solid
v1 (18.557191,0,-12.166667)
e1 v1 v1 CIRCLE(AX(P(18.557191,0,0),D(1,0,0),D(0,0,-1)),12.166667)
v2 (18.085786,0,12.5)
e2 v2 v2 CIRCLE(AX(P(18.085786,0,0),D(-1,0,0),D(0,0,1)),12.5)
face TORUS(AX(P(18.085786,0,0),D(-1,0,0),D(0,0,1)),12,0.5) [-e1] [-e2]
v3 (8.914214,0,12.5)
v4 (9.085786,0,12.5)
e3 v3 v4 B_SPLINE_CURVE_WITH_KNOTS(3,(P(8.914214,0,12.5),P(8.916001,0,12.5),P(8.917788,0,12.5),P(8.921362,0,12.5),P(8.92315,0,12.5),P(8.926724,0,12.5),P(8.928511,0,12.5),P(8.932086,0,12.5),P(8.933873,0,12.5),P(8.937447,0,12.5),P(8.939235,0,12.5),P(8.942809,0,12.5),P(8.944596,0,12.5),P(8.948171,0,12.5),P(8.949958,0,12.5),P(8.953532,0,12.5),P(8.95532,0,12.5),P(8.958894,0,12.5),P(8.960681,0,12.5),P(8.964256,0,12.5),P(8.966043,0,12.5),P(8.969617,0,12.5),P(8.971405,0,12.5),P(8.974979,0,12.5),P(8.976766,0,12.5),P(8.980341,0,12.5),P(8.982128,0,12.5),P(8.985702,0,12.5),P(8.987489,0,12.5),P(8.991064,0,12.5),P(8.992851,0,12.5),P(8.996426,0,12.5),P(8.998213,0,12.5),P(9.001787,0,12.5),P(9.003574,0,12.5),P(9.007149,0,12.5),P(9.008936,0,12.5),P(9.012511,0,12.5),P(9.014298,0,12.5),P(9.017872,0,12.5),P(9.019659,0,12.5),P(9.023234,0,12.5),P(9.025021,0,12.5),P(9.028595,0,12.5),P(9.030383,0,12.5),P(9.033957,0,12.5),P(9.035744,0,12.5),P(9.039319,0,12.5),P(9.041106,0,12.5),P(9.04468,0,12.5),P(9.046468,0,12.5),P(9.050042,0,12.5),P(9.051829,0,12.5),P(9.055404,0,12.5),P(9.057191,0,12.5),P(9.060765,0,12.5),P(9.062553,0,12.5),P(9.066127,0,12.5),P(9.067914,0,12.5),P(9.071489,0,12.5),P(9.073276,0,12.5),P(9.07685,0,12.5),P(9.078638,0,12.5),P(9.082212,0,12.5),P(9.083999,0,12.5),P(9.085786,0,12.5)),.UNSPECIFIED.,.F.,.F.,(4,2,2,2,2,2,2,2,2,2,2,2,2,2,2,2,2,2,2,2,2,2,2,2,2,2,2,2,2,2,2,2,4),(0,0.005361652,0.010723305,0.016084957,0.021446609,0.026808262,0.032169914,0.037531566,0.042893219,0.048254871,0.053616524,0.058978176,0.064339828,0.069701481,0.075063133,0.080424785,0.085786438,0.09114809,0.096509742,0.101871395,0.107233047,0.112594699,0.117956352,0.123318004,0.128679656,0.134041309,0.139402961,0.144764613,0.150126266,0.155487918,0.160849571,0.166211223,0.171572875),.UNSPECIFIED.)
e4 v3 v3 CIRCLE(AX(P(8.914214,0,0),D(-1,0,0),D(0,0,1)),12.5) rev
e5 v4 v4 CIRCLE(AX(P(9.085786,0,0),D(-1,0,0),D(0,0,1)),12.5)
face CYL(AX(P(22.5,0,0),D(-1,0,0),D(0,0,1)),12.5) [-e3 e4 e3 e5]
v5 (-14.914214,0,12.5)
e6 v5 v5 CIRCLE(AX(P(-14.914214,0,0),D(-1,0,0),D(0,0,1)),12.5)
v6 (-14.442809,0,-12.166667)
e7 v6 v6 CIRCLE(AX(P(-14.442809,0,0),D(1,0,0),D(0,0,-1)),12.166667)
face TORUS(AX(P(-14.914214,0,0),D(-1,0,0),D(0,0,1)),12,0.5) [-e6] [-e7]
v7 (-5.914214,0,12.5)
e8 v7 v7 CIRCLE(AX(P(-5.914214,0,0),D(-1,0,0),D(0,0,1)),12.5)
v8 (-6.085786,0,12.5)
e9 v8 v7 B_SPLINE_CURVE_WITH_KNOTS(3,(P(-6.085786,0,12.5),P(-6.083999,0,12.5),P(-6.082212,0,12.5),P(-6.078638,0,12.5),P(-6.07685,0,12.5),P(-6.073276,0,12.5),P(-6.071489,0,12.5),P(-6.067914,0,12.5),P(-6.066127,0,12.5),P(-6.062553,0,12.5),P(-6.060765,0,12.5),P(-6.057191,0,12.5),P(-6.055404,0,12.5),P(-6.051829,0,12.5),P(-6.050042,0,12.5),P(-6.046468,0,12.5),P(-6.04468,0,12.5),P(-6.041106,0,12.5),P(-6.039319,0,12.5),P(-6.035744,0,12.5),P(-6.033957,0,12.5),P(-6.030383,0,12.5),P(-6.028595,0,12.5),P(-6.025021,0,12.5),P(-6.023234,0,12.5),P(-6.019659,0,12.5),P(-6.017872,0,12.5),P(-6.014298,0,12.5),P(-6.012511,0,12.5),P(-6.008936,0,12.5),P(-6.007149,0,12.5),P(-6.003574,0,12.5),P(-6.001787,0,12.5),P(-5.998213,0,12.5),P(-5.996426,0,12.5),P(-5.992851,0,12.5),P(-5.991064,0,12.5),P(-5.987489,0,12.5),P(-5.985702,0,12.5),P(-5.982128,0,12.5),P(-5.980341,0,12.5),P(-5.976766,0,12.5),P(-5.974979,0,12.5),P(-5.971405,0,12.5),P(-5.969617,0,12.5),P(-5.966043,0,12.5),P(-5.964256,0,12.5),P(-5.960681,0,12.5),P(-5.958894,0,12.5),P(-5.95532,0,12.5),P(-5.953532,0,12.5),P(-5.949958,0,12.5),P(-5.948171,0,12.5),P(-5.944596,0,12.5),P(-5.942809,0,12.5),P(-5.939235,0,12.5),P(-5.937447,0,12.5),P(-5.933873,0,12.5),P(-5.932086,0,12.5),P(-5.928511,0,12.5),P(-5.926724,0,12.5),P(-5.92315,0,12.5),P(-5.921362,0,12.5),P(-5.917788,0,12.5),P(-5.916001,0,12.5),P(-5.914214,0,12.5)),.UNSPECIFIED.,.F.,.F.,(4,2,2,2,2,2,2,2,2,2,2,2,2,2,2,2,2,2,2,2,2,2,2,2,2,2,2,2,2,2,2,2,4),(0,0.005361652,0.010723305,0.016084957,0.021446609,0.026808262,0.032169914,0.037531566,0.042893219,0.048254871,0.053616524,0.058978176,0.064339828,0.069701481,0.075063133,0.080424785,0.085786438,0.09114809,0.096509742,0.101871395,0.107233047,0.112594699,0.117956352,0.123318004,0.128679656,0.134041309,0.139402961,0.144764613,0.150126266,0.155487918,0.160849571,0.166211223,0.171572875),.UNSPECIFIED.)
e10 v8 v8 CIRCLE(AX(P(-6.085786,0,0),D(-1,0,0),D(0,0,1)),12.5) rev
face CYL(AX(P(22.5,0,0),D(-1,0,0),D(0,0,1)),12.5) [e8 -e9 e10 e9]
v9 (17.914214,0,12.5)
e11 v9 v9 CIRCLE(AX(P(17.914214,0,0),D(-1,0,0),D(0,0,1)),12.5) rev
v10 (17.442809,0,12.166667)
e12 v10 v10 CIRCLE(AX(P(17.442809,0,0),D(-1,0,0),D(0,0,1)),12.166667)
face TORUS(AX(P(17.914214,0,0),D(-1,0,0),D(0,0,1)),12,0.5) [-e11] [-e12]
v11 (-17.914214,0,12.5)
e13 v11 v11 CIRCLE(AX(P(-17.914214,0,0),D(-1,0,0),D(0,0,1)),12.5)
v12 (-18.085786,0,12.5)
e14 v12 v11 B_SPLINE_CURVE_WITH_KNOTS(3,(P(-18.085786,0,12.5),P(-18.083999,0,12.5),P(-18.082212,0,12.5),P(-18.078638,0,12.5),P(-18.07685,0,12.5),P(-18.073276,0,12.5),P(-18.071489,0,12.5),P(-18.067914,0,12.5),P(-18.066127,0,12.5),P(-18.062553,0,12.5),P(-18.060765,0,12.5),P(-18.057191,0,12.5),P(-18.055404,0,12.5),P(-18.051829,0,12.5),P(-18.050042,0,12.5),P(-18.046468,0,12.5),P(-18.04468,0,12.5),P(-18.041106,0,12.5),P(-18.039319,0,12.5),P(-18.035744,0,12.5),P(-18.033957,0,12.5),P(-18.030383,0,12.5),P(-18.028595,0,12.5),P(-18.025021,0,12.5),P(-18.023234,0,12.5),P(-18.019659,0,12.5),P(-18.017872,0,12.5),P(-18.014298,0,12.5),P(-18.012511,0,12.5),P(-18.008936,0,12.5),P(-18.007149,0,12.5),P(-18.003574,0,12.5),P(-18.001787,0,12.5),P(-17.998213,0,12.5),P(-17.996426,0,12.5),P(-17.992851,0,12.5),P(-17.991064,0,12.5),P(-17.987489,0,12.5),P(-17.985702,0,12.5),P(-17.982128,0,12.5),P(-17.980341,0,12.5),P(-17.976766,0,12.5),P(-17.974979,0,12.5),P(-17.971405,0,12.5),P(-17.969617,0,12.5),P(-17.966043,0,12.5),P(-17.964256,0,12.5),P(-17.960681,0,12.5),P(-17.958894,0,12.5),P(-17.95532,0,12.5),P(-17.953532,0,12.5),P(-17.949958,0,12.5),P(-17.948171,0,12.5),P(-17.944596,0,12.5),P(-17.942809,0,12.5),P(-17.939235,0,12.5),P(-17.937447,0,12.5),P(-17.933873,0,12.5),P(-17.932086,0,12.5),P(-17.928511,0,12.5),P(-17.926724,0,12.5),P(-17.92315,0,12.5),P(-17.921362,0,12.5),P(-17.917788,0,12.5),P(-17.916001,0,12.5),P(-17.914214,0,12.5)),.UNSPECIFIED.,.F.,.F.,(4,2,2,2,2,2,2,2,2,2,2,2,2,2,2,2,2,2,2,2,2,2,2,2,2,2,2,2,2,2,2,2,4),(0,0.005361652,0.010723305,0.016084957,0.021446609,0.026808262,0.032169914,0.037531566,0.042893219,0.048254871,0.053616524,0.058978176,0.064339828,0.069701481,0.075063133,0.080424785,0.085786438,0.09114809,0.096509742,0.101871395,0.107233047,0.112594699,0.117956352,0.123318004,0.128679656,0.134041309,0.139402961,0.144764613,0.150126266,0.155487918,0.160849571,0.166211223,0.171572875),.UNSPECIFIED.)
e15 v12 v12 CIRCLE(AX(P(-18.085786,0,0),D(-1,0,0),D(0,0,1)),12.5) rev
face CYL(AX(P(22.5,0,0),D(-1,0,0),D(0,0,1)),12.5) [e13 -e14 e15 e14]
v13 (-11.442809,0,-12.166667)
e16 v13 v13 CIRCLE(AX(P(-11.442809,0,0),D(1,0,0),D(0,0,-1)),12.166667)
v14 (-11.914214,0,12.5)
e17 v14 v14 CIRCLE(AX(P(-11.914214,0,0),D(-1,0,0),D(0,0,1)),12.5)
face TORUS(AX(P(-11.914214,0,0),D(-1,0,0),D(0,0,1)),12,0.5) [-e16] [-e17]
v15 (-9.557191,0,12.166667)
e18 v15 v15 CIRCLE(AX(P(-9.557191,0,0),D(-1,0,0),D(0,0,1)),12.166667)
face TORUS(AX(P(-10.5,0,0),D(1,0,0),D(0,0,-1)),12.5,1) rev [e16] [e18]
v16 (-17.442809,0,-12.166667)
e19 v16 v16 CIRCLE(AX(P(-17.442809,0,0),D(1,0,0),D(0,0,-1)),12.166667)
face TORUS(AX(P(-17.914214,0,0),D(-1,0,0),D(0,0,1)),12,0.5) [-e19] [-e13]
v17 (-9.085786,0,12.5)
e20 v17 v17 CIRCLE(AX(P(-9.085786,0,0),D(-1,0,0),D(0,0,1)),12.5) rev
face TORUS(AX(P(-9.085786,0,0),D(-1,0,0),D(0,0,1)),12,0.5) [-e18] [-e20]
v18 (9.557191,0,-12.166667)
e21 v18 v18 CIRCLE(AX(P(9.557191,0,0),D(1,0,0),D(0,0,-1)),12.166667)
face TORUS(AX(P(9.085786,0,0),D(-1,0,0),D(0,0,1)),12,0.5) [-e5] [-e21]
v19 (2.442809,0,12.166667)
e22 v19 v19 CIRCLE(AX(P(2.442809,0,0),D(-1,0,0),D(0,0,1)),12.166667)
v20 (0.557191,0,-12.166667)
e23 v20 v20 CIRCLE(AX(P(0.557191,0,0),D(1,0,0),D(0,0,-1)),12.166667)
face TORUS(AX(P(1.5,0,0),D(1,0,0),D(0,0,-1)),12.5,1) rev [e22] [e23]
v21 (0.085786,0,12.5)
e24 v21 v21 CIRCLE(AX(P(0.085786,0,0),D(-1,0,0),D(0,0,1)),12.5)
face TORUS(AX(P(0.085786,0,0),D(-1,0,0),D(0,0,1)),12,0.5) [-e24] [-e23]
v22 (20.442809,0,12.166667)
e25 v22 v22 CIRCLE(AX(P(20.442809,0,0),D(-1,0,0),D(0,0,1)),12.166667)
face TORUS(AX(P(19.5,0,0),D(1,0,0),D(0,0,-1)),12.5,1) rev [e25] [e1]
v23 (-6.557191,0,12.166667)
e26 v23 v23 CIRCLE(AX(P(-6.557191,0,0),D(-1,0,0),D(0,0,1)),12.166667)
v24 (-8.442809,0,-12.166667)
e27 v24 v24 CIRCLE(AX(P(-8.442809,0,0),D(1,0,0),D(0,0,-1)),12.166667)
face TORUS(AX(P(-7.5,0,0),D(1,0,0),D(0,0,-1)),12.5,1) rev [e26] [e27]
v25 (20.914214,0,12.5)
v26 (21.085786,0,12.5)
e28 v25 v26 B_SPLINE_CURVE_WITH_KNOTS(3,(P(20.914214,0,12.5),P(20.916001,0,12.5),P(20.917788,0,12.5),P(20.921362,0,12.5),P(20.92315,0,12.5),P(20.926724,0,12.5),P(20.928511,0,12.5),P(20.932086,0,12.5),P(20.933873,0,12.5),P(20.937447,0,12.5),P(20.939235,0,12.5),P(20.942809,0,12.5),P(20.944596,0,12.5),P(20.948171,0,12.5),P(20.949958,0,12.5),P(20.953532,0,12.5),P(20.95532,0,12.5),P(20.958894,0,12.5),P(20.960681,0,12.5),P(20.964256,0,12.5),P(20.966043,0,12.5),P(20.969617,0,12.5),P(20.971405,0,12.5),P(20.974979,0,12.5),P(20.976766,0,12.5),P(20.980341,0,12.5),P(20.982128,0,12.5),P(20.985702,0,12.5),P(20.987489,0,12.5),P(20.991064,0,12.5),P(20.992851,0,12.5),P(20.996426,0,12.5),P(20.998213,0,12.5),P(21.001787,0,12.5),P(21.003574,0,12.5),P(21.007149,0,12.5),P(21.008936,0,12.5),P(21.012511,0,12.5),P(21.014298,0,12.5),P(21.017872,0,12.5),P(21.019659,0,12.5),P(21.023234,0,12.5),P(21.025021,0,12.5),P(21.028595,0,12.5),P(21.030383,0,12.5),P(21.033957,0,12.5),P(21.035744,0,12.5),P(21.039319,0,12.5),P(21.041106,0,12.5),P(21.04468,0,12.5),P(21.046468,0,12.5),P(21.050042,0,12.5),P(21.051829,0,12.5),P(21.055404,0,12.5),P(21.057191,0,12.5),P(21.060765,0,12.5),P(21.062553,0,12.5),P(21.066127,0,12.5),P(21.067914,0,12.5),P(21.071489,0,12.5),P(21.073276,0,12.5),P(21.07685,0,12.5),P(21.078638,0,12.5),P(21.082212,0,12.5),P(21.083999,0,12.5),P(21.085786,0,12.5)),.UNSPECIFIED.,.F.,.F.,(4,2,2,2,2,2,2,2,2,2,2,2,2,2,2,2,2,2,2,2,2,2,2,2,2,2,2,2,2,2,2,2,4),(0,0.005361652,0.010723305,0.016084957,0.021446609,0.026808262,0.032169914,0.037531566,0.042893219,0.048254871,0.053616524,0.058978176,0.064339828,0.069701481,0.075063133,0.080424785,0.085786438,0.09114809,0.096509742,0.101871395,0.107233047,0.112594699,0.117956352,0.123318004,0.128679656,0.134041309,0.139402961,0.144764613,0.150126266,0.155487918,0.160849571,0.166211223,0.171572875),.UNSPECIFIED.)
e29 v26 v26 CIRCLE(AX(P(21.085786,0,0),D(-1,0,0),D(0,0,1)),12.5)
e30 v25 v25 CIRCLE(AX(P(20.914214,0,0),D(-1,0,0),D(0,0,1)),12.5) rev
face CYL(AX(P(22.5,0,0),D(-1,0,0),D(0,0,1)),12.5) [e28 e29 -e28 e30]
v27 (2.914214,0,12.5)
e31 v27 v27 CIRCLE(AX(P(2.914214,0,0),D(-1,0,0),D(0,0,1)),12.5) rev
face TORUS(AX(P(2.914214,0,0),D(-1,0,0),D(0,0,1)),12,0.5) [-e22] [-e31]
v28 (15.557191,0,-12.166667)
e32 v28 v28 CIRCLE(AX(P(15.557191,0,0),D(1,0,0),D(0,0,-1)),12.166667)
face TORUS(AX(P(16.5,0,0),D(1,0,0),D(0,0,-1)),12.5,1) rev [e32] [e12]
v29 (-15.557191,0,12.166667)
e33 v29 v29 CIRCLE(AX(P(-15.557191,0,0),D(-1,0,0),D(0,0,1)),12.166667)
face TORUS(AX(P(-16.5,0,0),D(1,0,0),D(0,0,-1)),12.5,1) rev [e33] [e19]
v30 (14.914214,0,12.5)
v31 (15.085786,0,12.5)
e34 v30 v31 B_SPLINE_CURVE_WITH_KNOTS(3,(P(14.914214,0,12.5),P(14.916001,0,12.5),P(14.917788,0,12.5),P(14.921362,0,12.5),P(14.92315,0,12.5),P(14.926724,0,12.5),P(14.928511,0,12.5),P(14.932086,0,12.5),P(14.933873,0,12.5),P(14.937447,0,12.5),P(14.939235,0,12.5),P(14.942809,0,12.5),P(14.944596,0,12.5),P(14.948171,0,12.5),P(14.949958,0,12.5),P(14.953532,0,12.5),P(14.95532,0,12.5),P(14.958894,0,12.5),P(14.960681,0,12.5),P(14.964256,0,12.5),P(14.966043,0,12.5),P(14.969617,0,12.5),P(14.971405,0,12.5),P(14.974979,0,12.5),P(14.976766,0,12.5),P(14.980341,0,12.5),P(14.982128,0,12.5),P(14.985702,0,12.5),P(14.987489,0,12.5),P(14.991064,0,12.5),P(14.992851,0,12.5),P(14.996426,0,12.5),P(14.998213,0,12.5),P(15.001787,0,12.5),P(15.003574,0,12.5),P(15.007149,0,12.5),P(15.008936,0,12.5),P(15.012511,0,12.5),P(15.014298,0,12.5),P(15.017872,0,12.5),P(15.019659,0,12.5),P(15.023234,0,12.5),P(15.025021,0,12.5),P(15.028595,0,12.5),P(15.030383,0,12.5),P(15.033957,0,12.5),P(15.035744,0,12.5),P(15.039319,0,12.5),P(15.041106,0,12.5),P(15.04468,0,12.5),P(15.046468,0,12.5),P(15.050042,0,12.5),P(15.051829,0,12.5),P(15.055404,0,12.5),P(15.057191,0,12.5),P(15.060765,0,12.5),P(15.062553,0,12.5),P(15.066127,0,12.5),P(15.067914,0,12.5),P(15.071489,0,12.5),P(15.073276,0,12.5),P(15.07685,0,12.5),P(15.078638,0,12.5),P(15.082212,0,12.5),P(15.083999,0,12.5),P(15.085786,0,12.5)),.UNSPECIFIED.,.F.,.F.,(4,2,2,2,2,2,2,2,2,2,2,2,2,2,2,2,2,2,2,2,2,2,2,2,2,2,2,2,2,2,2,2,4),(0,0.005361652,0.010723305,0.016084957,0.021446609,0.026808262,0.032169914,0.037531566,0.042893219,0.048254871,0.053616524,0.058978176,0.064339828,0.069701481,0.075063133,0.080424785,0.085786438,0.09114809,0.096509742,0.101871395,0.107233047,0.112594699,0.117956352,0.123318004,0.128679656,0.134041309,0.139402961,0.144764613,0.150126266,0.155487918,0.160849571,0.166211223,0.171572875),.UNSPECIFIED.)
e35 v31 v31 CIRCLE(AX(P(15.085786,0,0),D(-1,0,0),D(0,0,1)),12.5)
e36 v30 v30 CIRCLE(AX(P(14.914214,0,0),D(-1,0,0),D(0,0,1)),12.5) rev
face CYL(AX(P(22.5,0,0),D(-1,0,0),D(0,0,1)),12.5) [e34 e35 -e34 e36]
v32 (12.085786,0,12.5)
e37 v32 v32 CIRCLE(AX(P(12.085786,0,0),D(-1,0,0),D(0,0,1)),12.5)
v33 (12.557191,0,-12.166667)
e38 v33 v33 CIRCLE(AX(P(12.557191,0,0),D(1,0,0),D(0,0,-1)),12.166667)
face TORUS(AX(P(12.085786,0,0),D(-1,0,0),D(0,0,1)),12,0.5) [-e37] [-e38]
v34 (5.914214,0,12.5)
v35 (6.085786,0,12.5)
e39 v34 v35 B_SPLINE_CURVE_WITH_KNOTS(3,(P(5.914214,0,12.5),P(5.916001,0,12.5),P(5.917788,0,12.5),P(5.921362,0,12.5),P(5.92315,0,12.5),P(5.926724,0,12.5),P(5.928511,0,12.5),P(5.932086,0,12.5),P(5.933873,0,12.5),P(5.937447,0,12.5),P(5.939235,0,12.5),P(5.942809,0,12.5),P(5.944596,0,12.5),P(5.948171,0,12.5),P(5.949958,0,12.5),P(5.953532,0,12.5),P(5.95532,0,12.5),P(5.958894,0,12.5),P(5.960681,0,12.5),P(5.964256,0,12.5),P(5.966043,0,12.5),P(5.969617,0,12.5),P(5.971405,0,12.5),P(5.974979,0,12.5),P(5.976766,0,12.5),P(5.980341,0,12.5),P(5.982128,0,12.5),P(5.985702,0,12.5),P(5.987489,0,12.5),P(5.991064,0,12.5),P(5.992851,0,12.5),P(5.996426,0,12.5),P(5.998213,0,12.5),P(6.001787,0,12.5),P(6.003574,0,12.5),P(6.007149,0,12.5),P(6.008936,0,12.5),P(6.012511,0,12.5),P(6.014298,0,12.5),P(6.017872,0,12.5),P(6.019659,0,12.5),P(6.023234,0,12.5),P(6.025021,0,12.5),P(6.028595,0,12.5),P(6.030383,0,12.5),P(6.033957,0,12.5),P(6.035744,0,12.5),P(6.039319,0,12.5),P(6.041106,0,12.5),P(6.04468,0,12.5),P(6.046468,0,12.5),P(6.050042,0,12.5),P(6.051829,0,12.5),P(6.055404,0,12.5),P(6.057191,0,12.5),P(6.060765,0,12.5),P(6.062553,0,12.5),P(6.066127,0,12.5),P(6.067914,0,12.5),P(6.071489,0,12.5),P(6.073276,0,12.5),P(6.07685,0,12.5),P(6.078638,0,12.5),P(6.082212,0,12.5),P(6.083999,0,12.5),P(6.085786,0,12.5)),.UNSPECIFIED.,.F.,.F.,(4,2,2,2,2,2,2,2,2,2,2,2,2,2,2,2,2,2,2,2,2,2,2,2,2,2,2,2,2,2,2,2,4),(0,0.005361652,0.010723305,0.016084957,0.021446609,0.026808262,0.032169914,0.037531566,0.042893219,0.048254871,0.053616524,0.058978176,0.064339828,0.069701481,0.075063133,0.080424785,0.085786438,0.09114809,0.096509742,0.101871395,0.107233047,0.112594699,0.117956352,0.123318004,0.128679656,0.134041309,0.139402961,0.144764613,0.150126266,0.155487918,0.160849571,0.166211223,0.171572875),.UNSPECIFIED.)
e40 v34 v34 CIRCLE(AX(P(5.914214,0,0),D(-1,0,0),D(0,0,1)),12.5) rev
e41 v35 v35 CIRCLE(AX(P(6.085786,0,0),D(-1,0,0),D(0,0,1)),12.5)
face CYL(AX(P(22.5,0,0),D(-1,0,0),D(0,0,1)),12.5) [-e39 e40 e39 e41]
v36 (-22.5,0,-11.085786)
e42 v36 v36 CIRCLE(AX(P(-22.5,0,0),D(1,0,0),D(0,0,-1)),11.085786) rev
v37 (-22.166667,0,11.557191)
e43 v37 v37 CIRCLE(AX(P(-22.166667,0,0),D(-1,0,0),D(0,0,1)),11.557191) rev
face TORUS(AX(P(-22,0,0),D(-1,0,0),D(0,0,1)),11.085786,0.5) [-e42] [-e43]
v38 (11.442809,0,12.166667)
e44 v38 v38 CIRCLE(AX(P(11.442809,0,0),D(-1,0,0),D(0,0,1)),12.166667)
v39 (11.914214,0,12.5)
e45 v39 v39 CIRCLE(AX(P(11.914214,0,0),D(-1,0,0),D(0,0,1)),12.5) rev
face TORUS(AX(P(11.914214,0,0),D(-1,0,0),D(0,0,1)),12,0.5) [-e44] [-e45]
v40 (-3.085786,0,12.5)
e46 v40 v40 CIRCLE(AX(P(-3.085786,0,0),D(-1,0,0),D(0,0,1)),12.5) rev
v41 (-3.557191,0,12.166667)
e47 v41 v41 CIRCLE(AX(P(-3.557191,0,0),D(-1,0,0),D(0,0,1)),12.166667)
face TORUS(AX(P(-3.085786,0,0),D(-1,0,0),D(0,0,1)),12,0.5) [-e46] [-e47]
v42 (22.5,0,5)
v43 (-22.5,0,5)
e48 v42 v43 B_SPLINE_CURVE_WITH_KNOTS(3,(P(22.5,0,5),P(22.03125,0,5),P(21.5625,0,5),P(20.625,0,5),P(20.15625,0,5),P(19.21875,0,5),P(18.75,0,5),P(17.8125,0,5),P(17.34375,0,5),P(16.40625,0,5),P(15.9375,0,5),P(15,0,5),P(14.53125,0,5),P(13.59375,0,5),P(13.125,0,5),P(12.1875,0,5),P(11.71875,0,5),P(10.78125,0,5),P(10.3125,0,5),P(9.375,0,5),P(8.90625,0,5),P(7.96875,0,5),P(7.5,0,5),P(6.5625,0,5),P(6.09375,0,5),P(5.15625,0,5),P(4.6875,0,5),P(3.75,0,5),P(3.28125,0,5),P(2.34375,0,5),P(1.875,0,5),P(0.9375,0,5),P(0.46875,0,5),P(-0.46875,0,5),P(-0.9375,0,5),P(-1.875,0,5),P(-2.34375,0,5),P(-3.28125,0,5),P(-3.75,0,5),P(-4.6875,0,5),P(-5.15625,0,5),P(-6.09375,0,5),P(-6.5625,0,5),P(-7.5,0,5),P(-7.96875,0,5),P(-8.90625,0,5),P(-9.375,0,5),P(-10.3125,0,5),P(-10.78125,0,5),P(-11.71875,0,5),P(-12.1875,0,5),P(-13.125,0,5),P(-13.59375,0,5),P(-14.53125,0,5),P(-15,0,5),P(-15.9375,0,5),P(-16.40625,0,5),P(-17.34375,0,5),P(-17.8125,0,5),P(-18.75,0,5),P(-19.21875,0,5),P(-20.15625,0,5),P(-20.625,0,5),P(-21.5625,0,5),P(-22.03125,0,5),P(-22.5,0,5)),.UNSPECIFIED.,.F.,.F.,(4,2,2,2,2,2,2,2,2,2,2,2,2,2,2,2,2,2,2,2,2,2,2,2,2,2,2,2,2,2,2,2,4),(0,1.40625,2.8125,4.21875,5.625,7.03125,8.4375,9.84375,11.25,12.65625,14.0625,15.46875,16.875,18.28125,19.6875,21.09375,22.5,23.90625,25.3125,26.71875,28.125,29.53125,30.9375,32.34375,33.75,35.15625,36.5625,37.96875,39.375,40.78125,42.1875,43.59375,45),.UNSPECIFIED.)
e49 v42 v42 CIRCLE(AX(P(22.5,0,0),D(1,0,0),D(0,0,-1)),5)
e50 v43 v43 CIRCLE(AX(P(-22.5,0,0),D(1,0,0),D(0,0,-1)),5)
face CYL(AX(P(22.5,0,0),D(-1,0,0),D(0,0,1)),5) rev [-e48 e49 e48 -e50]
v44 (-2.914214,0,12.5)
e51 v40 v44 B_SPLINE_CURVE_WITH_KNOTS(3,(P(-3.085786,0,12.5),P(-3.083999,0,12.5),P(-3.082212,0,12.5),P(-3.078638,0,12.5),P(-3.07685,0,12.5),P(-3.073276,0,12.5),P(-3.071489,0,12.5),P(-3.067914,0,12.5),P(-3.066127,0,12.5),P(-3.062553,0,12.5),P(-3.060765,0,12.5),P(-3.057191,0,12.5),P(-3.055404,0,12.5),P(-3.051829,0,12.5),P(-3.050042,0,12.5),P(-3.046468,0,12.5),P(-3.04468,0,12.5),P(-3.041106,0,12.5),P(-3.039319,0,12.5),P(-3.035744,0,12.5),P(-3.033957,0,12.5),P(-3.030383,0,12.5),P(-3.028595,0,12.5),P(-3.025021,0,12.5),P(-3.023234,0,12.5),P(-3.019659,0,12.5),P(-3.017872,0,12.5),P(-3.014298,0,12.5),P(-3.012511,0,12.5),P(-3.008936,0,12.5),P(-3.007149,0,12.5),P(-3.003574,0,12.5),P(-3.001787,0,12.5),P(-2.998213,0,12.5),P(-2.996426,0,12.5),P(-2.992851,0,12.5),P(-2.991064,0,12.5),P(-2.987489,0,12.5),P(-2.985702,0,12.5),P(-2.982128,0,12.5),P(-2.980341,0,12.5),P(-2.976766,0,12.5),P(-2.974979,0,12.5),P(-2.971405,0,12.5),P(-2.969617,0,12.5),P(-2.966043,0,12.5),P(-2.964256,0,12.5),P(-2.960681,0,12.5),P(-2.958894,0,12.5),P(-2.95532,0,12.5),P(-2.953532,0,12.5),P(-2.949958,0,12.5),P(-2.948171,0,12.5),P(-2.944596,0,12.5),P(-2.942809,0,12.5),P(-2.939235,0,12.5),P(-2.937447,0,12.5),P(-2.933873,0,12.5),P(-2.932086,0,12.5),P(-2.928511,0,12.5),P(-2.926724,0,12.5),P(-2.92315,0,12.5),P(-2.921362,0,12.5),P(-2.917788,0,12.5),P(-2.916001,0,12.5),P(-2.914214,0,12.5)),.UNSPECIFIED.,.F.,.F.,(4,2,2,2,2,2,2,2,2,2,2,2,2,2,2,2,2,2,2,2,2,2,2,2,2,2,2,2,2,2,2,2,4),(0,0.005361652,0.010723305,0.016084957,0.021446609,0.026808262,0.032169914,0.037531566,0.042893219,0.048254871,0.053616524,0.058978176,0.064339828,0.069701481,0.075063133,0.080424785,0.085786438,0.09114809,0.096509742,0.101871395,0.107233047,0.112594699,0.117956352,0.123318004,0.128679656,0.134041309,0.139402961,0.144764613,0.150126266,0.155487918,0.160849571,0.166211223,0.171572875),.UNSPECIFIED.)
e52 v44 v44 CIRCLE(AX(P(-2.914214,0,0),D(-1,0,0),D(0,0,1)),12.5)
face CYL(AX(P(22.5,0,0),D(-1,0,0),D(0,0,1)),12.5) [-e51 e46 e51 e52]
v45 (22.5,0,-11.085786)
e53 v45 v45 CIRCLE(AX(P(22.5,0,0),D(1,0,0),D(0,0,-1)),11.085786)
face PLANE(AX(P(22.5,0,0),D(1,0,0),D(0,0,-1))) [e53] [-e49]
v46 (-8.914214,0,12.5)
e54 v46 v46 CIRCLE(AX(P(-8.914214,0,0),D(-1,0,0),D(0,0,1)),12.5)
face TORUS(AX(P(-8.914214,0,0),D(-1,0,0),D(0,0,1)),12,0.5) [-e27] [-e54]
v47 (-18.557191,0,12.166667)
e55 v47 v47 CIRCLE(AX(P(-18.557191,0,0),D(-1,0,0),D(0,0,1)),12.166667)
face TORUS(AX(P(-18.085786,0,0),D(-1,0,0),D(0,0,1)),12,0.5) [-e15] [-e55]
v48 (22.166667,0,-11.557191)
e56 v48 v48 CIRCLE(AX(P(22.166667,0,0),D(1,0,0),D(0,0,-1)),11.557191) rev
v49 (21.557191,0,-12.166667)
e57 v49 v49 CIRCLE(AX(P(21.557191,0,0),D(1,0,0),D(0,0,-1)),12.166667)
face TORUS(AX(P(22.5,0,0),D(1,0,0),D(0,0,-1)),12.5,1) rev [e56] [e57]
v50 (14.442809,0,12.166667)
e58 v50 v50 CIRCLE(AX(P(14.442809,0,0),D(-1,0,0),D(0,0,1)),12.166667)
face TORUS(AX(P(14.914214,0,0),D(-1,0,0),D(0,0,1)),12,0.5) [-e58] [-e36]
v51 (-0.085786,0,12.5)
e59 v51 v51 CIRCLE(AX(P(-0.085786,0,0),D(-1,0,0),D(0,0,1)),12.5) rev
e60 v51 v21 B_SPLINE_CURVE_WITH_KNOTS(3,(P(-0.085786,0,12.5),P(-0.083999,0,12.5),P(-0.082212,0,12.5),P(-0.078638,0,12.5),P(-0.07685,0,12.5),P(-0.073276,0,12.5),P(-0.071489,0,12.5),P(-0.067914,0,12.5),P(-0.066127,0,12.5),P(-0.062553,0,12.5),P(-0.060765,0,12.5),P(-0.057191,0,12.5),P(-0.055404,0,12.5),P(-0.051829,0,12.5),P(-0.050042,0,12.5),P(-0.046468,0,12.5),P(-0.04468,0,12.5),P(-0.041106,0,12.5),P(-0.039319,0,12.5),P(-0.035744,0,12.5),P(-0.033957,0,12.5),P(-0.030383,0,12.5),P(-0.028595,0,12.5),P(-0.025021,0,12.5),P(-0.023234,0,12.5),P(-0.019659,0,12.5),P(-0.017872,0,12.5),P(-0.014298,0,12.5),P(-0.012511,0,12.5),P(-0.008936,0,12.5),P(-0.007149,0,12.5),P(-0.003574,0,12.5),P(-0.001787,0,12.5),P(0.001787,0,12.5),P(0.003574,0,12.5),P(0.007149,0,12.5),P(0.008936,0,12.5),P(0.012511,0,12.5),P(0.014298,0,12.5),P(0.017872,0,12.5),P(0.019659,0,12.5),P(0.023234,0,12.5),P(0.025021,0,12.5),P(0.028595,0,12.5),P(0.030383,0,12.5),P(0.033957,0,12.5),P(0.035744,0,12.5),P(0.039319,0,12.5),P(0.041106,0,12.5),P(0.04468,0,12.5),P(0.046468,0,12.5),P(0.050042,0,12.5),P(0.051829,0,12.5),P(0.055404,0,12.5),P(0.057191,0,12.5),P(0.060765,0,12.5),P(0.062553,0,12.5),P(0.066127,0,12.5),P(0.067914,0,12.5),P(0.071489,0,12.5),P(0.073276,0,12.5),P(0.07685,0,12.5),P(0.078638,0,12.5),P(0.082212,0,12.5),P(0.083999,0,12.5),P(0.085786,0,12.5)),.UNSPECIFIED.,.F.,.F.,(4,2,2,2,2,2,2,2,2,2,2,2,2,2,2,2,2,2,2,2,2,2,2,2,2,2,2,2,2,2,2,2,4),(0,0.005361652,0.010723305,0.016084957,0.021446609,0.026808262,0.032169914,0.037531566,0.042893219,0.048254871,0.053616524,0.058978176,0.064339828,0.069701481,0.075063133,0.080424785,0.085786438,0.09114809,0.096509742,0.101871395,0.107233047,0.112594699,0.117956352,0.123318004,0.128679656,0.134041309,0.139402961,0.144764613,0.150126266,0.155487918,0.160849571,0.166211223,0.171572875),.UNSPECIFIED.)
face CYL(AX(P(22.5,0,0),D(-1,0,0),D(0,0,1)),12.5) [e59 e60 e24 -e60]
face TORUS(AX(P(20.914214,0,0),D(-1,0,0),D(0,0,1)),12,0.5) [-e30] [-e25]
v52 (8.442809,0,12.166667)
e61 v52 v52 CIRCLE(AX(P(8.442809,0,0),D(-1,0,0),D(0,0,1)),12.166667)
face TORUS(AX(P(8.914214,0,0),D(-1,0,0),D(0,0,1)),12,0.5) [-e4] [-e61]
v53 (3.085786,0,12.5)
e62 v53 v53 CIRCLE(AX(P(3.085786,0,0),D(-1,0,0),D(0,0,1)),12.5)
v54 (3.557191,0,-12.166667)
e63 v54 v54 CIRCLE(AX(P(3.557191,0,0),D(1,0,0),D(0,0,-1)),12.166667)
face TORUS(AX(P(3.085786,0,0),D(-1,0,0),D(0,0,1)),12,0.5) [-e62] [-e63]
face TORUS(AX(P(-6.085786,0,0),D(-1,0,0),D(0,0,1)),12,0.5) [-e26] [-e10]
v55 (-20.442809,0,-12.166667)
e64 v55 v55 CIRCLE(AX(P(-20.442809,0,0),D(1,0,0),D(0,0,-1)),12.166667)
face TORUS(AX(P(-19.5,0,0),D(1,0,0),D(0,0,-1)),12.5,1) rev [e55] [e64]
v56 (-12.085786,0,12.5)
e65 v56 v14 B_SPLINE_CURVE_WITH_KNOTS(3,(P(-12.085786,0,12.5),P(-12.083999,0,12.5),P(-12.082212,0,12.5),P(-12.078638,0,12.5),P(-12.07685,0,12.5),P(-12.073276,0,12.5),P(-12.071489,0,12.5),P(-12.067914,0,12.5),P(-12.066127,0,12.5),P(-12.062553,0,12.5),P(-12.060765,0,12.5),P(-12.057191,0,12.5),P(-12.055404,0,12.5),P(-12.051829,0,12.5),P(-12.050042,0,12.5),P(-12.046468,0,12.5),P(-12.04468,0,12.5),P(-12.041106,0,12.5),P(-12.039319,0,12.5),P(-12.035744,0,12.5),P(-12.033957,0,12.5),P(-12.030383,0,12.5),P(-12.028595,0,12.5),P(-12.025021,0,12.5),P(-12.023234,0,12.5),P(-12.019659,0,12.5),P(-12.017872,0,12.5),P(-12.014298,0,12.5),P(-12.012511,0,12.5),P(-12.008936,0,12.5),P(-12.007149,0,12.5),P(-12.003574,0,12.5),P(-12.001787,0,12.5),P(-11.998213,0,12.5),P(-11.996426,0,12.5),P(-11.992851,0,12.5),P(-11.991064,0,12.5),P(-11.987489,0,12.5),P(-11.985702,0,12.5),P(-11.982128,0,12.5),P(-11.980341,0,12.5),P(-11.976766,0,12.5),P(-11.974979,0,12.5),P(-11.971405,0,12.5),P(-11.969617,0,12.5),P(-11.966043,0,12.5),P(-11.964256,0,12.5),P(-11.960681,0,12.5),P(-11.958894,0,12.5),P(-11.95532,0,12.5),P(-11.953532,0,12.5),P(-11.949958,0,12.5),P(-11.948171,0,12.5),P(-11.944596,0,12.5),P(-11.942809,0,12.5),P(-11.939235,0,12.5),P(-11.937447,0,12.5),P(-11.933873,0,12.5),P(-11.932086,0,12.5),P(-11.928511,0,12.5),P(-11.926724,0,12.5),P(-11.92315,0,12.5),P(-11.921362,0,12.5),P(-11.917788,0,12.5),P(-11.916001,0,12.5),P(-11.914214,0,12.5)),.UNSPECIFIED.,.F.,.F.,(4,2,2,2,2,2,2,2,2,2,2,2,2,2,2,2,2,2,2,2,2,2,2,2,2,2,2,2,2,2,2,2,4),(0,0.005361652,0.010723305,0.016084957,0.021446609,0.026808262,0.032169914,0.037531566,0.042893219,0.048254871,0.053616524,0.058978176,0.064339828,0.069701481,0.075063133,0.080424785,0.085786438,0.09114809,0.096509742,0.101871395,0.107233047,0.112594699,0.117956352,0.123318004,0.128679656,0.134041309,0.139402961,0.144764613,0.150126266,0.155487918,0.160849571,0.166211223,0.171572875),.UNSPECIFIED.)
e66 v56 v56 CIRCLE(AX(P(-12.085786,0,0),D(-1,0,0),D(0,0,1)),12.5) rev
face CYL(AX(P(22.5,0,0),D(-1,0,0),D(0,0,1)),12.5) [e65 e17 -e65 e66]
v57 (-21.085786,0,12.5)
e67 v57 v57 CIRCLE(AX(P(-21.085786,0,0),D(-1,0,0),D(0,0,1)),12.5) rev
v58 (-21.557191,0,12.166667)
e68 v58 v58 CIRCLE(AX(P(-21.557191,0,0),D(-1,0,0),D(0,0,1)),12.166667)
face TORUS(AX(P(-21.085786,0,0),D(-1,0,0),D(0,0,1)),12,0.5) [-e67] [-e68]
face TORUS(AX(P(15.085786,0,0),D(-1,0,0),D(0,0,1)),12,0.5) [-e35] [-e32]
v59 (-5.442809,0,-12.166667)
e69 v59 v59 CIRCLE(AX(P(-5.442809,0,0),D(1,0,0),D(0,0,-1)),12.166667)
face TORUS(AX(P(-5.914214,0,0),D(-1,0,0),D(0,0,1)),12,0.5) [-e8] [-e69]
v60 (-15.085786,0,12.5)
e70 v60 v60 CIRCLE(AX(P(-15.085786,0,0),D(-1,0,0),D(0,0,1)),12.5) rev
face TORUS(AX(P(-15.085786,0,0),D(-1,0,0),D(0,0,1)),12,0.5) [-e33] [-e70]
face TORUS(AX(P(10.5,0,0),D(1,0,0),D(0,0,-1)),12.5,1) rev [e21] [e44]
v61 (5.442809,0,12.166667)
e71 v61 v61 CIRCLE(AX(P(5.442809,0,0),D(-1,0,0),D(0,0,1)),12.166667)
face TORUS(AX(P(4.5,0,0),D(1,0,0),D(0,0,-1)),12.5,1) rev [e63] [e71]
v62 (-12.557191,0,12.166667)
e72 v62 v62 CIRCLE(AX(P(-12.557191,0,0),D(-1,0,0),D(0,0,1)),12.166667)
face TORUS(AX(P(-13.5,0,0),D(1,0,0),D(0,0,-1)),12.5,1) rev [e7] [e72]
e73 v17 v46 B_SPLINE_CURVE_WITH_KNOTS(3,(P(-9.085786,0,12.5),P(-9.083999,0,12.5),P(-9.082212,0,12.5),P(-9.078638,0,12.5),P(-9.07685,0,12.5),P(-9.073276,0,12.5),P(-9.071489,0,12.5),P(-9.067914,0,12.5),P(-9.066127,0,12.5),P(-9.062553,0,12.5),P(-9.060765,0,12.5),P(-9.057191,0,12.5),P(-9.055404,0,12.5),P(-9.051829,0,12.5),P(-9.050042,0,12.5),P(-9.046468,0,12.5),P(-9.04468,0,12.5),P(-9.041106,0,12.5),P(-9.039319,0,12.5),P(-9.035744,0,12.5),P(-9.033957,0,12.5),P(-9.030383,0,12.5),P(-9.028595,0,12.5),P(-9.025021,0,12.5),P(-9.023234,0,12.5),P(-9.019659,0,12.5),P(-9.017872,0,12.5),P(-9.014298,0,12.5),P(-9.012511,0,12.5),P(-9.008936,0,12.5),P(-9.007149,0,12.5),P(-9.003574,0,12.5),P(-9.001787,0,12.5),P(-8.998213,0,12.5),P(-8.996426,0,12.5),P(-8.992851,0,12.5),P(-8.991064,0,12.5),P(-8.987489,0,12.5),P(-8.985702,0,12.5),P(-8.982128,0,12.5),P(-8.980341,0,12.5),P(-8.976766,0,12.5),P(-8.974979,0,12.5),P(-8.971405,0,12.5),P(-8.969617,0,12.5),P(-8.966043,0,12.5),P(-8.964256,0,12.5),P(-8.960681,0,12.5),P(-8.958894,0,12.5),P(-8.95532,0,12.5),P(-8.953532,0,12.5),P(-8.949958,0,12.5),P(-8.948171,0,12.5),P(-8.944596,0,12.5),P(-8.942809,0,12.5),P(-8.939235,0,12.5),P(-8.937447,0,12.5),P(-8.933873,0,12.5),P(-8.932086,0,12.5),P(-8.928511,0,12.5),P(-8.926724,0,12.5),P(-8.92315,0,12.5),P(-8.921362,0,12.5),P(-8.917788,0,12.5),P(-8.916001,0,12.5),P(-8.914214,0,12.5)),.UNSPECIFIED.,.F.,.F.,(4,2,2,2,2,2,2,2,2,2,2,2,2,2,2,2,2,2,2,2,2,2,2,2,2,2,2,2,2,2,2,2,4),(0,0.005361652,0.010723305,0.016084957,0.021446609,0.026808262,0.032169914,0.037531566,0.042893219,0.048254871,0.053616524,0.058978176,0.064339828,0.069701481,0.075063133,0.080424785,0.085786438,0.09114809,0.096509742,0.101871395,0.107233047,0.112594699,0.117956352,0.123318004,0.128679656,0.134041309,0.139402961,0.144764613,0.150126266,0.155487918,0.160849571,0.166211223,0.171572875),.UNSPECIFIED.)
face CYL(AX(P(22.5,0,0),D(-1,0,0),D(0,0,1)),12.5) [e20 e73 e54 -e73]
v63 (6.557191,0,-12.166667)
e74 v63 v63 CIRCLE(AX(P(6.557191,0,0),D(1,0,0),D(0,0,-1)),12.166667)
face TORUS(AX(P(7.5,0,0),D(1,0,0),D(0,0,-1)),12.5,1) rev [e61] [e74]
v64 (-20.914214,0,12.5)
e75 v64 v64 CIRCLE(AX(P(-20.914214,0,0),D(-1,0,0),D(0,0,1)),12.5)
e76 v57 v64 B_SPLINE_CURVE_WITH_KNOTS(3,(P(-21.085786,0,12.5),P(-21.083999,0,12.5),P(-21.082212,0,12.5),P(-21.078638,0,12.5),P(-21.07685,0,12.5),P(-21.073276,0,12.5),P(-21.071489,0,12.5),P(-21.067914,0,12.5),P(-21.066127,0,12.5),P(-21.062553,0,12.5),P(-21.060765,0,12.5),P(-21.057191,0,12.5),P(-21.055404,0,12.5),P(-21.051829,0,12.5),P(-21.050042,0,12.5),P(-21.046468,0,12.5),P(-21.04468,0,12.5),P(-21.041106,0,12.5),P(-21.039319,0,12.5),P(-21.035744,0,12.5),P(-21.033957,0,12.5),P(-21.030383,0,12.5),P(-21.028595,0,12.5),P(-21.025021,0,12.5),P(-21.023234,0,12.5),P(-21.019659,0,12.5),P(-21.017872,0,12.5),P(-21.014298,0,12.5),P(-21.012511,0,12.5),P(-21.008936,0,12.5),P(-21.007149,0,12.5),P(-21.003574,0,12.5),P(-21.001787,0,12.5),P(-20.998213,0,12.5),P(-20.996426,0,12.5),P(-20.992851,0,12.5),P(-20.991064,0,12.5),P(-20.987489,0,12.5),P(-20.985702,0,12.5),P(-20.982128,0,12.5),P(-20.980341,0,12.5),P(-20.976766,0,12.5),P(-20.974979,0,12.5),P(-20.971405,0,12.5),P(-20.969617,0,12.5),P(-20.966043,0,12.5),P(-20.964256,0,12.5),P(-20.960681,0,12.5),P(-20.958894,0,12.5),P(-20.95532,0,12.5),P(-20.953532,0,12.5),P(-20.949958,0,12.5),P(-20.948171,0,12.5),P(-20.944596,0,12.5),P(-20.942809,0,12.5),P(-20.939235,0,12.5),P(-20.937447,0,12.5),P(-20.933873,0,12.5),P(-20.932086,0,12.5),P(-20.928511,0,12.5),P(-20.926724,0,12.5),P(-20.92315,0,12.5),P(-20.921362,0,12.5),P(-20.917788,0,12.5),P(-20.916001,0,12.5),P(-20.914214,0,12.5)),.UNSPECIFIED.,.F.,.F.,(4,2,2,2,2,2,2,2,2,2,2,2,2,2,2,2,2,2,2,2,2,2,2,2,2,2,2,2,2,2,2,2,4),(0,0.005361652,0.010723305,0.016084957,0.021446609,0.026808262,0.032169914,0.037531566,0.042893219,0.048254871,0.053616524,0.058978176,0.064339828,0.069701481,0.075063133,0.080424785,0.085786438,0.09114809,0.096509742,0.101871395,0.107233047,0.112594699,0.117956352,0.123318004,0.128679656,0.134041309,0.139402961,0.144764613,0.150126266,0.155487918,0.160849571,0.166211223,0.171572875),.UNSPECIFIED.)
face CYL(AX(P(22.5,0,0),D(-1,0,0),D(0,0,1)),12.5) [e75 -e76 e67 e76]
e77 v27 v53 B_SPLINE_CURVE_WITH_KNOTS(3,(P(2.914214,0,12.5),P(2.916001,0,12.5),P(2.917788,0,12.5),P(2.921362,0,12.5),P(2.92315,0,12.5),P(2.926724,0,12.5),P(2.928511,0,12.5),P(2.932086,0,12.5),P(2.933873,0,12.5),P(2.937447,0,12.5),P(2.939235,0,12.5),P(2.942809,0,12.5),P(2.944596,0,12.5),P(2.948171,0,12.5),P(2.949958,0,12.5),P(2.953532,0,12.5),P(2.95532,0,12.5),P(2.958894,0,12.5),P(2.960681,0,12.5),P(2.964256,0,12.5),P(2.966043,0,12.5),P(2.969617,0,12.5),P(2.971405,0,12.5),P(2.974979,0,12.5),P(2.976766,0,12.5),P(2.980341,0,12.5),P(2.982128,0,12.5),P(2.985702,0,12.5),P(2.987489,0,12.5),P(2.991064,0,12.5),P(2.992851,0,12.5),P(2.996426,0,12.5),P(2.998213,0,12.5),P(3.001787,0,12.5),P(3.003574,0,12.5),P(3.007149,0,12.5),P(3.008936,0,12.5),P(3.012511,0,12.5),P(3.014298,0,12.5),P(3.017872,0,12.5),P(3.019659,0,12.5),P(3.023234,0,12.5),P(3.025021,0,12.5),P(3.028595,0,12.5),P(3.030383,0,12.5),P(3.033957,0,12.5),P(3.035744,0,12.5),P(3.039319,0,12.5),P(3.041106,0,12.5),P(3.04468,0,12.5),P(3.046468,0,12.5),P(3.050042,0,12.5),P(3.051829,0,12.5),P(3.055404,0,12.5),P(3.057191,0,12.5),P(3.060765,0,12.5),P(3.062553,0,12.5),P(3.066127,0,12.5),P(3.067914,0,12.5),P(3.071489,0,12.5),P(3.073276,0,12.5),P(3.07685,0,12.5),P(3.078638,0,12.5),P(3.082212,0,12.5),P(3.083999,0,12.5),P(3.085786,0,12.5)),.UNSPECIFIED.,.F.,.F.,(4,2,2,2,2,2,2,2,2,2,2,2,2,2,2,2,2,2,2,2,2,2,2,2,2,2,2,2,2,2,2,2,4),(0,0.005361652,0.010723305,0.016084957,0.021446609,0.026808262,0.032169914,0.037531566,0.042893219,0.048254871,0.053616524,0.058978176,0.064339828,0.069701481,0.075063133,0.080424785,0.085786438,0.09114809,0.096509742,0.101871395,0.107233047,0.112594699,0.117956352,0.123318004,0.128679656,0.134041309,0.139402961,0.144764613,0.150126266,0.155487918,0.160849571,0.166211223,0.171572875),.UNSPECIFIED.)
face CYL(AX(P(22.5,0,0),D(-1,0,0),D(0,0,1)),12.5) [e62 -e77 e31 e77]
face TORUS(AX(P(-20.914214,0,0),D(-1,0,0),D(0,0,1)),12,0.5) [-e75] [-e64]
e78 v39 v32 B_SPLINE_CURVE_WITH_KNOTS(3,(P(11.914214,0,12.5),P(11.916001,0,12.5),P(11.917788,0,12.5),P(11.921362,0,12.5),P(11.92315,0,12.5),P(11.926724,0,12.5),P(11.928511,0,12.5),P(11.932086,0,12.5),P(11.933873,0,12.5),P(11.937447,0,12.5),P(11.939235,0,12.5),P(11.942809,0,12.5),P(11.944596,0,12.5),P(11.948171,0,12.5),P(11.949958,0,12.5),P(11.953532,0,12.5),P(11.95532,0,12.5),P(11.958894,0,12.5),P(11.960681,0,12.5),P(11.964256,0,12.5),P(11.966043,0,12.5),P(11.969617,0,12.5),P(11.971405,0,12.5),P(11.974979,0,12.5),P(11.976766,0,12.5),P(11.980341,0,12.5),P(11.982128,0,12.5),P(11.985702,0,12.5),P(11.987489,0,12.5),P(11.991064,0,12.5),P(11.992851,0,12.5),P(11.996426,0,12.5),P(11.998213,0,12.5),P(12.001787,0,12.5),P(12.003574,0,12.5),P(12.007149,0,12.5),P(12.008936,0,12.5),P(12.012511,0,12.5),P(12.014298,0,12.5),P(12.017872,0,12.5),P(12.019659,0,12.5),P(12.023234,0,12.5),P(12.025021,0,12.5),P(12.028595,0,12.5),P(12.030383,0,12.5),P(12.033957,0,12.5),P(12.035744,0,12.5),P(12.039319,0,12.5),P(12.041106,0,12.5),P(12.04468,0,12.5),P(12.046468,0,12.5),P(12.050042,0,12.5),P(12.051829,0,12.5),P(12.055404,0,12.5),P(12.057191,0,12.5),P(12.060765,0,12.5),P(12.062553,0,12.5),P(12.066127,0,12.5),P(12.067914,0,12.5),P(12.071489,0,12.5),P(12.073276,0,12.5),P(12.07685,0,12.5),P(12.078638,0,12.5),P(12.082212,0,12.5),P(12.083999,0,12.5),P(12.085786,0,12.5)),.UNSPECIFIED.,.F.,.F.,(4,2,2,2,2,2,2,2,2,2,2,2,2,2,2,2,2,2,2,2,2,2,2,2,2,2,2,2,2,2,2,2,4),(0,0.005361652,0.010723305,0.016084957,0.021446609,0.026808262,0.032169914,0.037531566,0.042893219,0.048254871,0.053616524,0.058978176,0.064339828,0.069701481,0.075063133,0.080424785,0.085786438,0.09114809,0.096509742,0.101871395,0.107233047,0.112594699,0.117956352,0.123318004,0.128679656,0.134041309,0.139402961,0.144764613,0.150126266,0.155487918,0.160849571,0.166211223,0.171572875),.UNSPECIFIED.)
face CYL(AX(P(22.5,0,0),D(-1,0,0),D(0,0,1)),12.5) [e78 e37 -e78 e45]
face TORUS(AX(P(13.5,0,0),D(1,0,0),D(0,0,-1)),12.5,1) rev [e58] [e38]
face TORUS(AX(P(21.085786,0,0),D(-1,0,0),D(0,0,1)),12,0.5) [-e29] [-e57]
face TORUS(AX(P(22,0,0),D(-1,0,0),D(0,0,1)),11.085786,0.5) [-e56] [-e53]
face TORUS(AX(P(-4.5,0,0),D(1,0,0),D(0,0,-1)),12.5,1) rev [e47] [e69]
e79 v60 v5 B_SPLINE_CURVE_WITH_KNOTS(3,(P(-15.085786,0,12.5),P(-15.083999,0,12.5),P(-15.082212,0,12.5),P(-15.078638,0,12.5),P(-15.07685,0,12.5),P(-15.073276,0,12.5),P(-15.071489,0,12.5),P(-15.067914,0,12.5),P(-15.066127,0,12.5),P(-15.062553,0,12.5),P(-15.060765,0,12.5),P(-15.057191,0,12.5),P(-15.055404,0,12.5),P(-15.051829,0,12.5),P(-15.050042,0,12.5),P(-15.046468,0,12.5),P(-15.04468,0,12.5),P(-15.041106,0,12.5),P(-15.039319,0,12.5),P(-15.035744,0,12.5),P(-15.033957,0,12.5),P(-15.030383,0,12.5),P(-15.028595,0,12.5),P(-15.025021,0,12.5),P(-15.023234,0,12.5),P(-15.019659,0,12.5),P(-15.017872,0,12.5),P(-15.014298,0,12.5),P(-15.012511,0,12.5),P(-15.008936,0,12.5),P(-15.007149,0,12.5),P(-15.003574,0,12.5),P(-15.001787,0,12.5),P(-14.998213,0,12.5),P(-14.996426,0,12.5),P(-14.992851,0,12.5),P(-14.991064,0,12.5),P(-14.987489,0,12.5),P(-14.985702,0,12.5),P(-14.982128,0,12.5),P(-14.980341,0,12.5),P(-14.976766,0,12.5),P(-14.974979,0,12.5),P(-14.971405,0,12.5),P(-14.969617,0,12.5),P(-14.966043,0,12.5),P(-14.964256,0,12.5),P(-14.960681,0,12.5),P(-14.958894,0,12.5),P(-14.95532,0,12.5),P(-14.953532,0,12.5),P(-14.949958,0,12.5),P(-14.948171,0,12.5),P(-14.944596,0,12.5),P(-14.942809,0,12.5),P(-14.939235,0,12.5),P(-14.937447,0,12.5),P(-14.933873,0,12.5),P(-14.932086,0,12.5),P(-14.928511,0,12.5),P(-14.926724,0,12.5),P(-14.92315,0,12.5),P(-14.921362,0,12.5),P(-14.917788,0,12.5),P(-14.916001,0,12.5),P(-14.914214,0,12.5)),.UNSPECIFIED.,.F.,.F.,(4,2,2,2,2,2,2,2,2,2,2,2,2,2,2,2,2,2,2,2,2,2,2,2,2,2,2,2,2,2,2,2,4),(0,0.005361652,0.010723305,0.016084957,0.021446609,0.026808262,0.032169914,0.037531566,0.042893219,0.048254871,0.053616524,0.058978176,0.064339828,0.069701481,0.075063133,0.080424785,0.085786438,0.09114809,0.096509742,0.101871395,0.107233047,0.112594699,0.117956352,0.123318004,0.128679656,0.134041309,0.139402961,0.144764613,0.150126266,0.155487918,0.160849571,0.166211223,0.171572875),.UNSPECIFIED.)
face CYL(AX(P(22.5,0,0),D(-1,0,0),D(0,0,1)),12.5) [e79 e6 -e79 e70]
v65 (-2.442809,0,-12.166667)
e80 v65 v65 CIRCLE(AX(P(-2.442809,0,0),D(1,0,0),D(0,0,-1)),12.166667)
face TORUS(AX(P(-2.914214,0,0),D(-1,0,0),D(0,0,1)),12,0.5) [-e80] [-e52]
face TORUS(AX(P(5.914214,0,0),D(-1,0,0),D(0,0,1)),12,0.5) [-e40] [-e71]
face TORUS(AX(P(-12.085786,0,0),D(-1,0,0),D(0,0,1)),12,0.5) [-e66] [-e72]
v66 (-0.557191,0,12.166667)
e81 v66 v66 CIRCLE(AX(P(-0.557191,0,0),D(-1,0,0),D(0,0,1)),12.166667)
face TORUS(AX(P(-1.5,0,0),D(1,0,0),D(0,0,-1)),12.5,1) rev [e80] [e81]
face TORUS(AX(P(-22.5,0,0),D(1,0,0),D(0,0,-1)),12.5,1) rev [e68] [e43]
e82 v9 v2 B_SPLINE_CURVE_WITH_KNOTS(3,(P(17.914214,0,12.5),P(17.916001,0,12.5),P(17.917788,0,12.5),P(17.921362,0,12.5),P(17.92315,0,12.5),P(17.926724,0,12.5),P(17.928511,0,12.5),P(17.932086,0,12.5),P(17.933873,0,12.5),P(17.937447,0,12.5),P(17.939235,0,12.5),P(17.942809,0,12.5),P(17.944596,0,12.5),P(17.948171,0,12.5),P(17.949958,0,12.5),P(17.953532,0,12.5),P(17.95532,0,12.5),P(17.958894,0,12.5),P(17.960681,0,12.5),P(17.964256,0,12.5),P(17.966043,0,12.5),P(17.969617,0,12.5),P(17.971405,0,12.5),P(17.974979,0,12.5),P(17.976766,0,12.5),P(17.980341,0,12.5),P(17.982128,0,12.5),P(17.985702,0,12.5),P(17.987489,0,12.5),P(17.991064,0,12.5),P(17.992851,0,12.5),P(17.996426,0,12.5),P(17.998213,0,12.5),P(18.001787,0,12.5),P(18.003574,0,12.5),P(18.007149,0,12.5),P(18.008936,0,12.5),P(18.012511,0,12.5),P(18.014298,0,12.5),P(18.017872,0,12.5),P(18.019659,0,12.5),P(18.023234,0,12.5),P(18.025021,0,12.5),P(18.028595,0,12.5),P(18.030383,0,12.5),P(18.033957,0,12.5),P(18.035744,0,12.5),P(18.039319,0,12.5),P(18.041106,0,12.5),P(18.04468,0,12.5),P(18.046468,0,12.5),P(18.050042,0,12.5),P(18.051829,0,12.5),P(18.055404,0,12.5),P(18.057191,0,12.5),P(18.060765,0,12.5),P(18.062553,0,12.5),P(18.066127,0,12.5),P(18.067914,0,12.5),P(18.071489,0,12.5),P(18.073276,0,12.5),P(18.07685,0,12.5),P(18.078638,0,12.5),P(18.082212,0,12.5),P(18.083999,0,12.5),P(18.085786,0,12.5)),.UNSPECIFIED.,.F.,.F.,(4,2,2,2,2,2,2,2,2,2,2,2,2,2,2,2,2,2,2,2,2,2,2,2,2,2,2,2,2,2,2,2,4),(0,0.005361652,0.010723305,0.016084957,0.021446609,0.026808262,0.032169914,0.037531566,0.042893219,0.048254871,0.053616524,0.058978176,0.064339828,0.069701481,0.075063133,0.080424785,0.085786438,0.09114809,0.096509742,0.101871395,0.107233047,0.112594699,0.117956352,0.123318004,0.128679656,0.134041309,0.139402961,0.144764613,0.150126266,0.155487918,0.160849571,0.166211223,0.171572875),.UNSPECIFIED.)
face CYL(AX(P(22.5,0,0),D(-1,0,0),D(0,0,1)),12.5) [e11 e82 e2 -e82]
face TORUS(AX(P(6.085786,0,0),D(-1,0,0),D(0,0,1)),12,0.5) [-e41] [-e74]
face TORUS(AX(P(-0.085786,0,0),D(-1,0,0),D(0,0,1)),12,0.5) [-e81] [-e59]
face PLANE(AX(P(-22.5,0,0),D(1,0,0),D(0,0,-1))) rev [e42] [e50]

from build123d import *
from build123d.topology import SkipClean

# Parameters (mm, degrees)
SKETCH1_R           = 12.5
SKETCH1_R_2         = 5
BOSS_EXTRUDE1_DEPTH = 22.5
SKETCH11_R          = 1
SKETCH11_5_R        = 1
LPATTERN2_COUNT     = 16
LPATTERN2_PITCH     = 3
FILLET2_R           = 0.5


# Read off the part's stored shape, not the designer's step: LPattern1
with BuildPart() as part:
    # Sketch1 → Boss-Extrude1 (new, symmetric)
    with BuildSketch(Plane.YZ):
        with Locations(Location((0, 0, 0), (0, 0, 90))):
            Circle(SKETCH1_R)
        with Locations(Location((0, 0, 0), (0, 0, 90))):
            Circle(SKETCH1_R_2, mode=Mode.SUBTRACT)
    extrude(amount=BOSS_EXTRUDE1_DEPTH, both=True)

    # Sketch11 → Cut-Revolve1 (revolve, cut)
    with BuildSketch(Plane(origin=(0, 0, 0), x_dir=(-1, 0, 0), z_dir=(0, 1, 0))):
        with Locations((-22.5, 12.5)):
            Circle(SKETCH11_R)
    revolve(axis=Axis((25.114184058, 0, 0), (-1, 0, 0)), mode=Mode.SUBTRACT)

    # LPattern1 outline → LPattern1 (revolve, cut)
    with BuildSketch(Plane.YX):
        with BuildLine():
            Line((12.5, 19.5), (11.5, 19.5))
            ThreePointArc((11.5, 19.5), (11.792893219, 18.792893219), (12.5, 18.5))
            Line((12.5, 18.5), (12.5, 19.5))
        make_face()
        with BuildLine():
            Line((12.5, 15.5), (12.5, 16.5))
            Line((12.5, 16.5), (11.5, 16.5))
            ThreePointArc((11.5, 16.5), (11.792893219, 15.792893219), (12.5, 15.5))
        make_face()
        with BuildLine():
            Line((12.5, 12.5), (12.5, 13.5))
            Line((12.5, 13.5), (11.5, 13.5))
            ThreePointArc((11.5, 13.5), (11.792893219, 12.792893219), (12.5, 12.5))
        make_face()
        with BuildLine():
            Line((12.5, 9.5), (12.5, 10.5))
            Line((12.5, 10.5), (11.5, 10.5))
            ThreePointArc((11.5, 10.5), (11.792893219, 9.792893219), (12.5, 9.5))
        make_face()
        with BuildLine():
            Line((12.5, 6.5), (12.5, 7.5))
            Line((12.5, 7.5), (11.5, 7.5))
            ThreePointArc((11.5, 7.5), (11.792893219, 6.792893219), (12.5, 6.5))
        make_face()
        with BuildLine():
            Line((12.5, 3.5), (12.5, 4.5))
            Line((12.5, 4.5), (11.5, 4.5))
            ThreePointArc((11.5, 4.5), (11.792893219, 3.792893219), (12.5, 3.5))
        make_face()
        with BuildLine():
            Line((12.5, 0.5), (12.5, 1.5))
            Line((12.5, 1.5), (11.5, 1.5))
            ThreePointArc((11.5, 1.5), (11.792893219, 0.792893219), (12.5, 0.5))
        make_face()
        with BuildLine():
            Line((12.5, -2.5), (12.5, -1.5))
            Line((12.5, -1.5), (11.5, -1.5))
            ThreePointArc((11.5, -1.5), (11.792893219, -2.207106781), (12.5, -2.5))
        make_face()
        with BuildLine():
            Line((12.5, -5.5), (12.5, -4.5))
            Line((12.5, -4.5), (11.5, -4.5))
            ThreePointArc((11.5, -4.5), (11.792893219, -5.207106781), (12.5, -5.5))
        make_face()
        with BuildLine():
            Line((12.5, -8.5), (12.5, -7.5))
            Line((12.5, -7.5), (11.5, -7.5))
            ThreePointArc((11.5, -7.5), (11.792893219, -8.207106781), (12.5, -8.5))
        make_face()
        with BuildLine():
            Line((12.5, -11.5), (12.5, -10.5))
            Line((12.5, -10.5), (11.5, -10.5))
            ThreePointArc((11.5, -10.5), (11.792893219, -11.207106781), (12.5, -11.5))
        make_face()
        with BuildLine():
            Line((12.5, -14.5), (12.5, -13.5))
            Line((12.5, -13.5), (11.5, -13.5))
            ThreePointArc((11.5, -13.5), (11.792893219, -14.207106781), (12.5, -14.5))
        make_face()
        with BuildLine():
            Line((12.5, -17.5), (12.5, -16.5))
            Line((12.5, -16.5), (11.5, -16.5))
            ThreePointArc((11.5, -16.5), (11.792893219, -17.207106781), (12.5, -17.5))
        make_face()
        with BuildLine():
            Line((12.5, -20.5), (12.5, -19.5))
            Line((12.5, -19.5), (11.5, -19.5))
            ThreePointArc((11.5, -19.5), (11.792893219, -20.207106781), (12.5, -20.5))
        make_face()
    revolve(axis=Axis((0, 0, 0), (1, 0, 0)), mode=Mode.SUBTRACT)

    # Sketch11<5> → Cut-Revolve2 (revolve, cut)
    with BuildSketch(Plane(origin=(0, 0, 0), x_dir=(-1, 0, 0), z_dir=(0, 1, 0)), mode=Mode.PRIVATE) as cut_revolve2_sk:
        with Locations((22.5, 12.5)):
            Circle(SKETCH11_5_R)
    cut_revolve2 = revolve(cut_revolve2_sk.sketch.rotate(Axis((25.114184058, 0, 0), (-1, 0, 0)), 180), axis=Axis((25.114184058, 0, 0), (-1, 0, 0)), mode=Mode.SUBTRACT)

    # LPattern2: Cut-Revolve2 ×16
    with SkipClean():  # the faces are left unmerged after this step: merging them gives an invalid solid
        with Locations(*[(i * LPATTERN2_PITCH, 0, 0) for i in range(1, LPATTERN2_COUNT)]):
            add(cut_revolve2, mode=Mode.SUBTRACT)

    # Fillet2
    fillet2_edges = [part.edges().sort_by_distance(p)[0] for p in [
        (-12.5, 12.5, 0),
        (-9.5, 12.5, 0),
        (22.5, -11.5, 0),
        (-6.5, 12.5, 0),
        (21.5, -12.5, 0),
        (-3.5, 12.5, 0),
        (-0.5, 12.5, 0),
        (2.5, 12.5, 0),
        (5.5, -12.5, 0),
        (8.5, -12.5, 0),
        (11.5, -12.5, 0),
        (14.5, -12.5, 0),
        (17.5, -12.5, 0),
        (20.5, -12.5, 0),
        (18.5, -12.5, 0),
        (15.5, -12.5, 0),
        (12.5, -12.5, 0),
        (9.5, -12.5, 0),
        (6.5, -12.5, 0),
        (3.5, -12.5, 0),
        (0.5, -12.5, 0),
        (-2.5, -12.5, 0),
        (-5.5, -12.5, 0),
        (-8.5, -12.5, 0),
        (-11.5, -12.5, 0),
        (-14.5, -12.5, 0),
        (-17.5, -12.5, 0),
        (-20.5, -12.5, 0),
        (-21.5, -12.5, 0),
        (-22.5, 0, 11.5),
        (-18.5, 12.5, 0),
        (-15.5, 12.5, 0),
    ]]
    fillet(fillet2_edges, radius=FILLET2_R)


solid = part.part
